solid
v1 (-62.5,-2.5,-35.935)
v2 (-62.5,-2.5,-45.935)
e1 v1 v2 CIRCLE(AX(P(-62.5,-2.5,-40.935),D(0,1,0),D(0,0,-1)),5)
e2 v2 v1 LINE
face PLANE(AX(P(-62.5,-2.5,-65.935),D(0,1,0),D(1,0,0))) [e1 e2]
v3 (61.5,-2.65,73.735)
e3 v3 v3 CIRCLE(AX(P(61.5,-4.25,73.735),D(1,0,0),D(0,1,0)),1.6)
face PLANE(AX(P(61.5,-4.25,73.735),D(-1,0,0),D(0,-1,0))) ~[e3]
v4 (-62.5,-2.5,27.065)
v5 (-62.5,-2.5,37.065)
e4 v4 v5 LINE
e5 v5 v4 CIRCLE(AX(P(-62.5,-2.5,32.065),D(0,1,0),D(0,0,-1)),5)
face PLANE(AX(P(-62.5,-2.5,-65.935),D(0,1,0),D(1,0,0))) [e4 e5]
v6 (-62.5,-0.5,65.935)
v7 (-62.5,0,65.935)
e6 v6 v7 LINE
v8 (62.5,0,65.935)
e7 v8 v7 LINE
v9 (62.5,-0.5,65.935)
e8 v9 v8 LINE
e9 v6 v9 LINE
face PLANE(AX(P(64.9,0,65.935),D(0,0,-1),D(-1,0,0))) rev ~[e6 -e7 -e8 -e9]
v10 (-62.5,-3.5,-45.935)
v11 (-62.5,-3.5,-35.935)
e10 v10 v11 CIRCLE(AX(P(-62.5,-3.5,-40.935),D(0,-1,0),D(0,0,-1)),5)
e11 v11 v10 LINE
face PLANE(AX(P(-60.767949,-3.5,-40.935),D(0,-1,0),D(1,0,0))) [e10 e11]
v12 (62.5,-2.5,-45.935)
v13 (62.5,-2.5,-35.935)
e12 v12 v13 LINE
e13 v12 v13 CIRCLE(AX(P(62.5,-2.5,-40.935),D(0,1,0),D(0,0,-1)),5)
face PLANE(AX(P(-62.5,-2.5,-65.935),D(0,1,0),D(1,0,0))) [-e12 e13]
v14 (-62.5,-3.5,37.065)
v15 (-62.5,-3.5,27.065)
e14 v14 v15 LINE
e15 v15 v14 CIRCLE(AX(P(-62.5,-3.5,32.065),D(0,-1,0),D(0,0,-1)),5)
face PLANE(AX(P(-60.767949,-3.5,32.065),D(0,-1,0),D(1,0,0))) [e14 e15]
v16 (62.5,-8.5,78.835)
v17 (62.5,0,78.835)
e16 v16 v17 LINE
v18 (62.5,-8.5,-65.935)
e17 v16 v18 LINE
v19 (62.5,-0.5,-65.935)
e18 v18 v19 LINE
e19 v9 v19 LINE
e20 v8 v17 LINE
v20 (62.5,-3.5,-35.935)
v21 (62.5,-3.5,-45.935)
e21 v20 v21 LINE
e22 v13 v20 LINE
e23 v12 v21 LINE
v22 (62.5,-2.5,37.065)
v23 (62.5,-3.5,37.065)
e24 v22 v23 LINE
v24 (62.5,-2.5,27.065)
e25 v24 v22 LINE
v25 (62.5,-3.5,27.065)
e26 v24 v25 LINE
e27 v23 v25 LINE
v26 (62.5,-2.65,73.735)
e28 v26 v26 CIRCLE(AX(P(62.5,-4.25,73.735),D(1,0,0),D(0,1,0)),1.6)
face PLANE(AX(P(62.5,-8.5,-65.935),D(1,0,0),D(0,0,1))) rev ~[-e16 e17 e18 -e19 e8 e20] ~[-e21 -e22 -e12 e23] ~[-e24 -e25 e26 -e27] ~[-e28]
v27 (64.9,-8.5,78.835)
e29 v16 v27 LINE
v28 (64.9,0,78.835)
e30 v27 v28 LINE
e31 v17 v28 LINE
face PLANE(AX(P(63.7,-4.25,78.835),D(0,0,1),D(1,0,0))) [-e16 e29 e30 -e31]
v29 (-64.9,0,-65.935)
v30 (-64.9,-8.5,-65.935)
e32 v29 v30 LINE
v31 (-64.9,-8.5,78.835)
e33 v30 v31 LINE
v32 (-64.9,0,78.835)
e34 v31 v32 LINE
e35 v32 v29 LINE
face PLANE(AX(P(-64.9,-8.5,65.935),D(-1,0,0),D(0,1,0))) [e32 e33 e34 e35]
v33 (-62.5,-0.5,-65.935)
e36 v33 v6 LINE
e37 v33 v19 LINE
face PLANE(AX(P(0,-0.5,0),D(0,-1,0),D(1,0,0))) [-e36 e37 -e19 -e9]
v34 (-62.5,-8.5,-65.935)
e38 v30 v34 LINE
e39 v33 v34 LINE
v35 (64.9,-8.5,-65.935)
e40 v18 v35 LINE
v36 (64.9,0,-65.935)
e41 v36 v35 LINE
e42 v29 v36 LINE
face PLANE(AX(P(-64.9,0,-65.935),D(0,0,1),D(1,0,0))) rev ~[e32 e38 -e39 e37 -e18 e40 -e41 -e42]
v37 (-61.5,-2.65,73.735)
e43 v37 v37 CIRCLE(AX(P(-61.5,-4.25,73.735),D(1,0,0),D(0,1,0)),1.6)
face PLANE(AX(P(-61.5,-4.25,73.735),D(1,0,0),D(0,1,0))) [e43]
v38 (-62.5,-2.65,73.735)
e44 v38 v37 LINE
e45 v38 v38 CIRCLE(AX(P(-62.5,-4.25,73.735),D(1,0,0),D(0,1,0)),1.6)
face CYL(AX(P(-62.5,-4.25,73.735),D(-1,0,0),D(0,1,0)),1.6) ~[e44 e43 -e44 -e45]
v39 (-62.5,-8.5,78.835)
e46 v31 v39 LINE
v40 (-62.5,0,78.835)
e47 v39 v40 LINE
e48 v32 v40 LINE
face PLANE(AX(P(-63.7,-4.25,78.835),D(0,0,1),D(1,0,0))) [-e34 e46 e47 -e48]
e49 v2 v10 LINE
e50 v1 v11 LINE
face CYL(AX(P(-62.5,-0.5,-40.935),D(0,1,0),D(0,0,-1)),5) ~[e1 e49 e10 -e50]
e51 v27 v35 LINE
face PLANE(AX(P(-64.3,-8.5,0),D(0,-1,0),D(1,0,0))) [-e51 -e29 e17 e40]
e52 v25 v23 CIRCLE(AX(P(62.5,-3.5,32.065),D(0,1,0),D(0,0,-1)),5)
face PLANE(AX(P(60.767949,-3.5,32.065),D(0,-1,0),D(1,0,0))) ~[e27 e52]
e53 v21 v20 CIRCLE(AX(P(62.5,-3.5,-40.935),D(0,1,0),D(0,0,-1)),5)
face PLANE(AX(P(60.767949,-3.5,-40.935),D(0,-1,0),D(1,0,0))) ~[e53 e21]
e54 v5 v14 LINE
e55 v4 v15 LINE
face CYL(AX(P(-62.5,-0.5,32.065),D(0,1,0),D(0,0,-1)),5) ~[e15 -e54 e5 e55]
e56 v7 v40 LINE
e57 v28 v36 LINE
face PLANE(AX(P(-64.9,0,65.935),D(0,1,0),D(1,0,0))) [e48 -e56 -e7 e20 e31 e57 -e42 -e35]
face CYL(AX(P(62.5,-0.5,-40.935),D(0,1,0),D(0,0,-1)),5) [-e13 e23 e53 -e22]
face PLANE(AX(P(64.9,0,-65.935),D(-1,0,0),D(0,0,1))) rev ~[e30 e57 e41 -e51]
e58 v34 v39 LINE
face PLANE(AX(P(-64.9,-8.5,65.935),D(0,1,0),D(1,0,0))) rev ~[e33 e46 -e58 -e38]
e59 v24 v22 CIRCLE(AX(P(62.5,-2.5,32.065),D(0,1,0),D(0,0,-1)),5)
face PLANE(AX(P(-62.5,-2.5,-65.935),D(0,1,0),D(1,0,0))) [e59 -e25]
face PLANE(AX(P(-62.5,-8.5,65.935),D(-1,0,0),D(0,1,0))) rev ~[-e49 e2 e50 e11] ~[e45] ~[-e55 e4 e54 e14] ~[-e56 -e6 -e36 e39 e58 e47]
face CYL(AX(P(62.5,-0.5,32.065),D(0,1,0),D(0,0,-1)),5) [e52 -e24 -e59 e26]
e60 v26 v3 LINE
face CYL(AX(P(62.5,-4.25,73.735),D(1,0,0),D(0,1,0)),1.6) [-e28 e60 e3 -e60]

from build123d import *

# Parameters (mm, degrees)
F0_W      = 1.2
F0_H      = 131.87
F0_W_2    = 127.4
F1_DEPTH  = 8.5
F2_W      = 125
F2_H      = 131.87
F3_DEPTH  = 8
F4_W      = 2.4
F4_H      = 8.5
F5_DEPTH  = 12.9
F6_R      = 1.6
F7_DEPTH  = 1
F9_DEPTH  = 3
F10_W     = 125
F10_H     = 2
F11_DEPTH = 130


# Not quite as in the source:
# - a pattern or mirror of a feature is missing from the dataset's text; its kind, count and spacing are read off the source's solid


with BuildPart() as f1:
    # F0 (on Front) → F1 (new body)
    with BuildSketch(Plane.XZ):
        with Locations((-64.3, 0)):
            Rectangle(F0_W, F0_H)
        Rectangle(F0_W_2, F0_H)
        with Locations((64.3, 0)):
            Rectangle(F0_W, F0_H)
    extrude(amount=F1_DEPTH)

    # F2 (on face) → F3 (cut)
    with BuildSketch(Plane.XZ.offset(8.5)):
        Rectangle(F2_W, F2_H)
    extrude(amount=-F3_DEPTH, mode=Mode.SUBTRACT)

    # F4 (on face) → F5 (join)
    with BuildSketch(Plane.XY.offset(65.935)):
        with Locations((-63.7, -4.25)):
            Rectangle(F4_W, F4_H)
        with Locations((63.7, -4.25)):
            Rectangle(F4_W, F4_H)
    extrude(amount=F5_DEPTH)

    # F6 (on face) → F7 (join)
    with BuildSketch(Plane.YZ.offset(-62.5)):
        with Locations((-4.25, 73.735)):
            Circle(F6_R)
    f7 = extrude(amount=F7_DEPTH)

    # F7_copies: F7 across plane
    add(f7.mirror(Plane(origin=(0, 0, 0), x_dir=(0, 0, 1), z_dir=(1, 0, 0))))

    # F8 (on face) → F9 (join)
    with BuildSketch(Plane.XZ.offset(0.5)):
        with BuildLine():
            Line((-62.5, -35.935), (-62.5, -45.935))
            ThreePointArc((-62.5, -45.935), (-57.5, -40.935), (-62.5, -35.935))
        make_face()
        with BuildLine():
            Line((-62.5, 37.065), (-62.5, 27.065))
            ThreePointArc((-62.5, 27.065), (-57.5, 32.065), (-62.5, 37.065))
        make_face()
    f9 = extrude(amount=F9_DEPTH)

    # F9_copies: F9 across plane
    add(f9.mirror(Plane(origin=(0, 0, 0), x_dir=(0, 0, 1), z_dir=(1, 0, 0))))

    # F10 (on face) → F11 (cut)
    with BuildSketch(Plane(origin=(0, 0, -65.935), x_dir=(1, 0, 0), z_dir=(0, 0, -1))):
        with Locations((0, 1.5)):
            Rectangle(F10_W, F10_H)
    extrude(amount=-F11_DEPTH, mode=Mode.SUBTRACT)


solid = f1.part
